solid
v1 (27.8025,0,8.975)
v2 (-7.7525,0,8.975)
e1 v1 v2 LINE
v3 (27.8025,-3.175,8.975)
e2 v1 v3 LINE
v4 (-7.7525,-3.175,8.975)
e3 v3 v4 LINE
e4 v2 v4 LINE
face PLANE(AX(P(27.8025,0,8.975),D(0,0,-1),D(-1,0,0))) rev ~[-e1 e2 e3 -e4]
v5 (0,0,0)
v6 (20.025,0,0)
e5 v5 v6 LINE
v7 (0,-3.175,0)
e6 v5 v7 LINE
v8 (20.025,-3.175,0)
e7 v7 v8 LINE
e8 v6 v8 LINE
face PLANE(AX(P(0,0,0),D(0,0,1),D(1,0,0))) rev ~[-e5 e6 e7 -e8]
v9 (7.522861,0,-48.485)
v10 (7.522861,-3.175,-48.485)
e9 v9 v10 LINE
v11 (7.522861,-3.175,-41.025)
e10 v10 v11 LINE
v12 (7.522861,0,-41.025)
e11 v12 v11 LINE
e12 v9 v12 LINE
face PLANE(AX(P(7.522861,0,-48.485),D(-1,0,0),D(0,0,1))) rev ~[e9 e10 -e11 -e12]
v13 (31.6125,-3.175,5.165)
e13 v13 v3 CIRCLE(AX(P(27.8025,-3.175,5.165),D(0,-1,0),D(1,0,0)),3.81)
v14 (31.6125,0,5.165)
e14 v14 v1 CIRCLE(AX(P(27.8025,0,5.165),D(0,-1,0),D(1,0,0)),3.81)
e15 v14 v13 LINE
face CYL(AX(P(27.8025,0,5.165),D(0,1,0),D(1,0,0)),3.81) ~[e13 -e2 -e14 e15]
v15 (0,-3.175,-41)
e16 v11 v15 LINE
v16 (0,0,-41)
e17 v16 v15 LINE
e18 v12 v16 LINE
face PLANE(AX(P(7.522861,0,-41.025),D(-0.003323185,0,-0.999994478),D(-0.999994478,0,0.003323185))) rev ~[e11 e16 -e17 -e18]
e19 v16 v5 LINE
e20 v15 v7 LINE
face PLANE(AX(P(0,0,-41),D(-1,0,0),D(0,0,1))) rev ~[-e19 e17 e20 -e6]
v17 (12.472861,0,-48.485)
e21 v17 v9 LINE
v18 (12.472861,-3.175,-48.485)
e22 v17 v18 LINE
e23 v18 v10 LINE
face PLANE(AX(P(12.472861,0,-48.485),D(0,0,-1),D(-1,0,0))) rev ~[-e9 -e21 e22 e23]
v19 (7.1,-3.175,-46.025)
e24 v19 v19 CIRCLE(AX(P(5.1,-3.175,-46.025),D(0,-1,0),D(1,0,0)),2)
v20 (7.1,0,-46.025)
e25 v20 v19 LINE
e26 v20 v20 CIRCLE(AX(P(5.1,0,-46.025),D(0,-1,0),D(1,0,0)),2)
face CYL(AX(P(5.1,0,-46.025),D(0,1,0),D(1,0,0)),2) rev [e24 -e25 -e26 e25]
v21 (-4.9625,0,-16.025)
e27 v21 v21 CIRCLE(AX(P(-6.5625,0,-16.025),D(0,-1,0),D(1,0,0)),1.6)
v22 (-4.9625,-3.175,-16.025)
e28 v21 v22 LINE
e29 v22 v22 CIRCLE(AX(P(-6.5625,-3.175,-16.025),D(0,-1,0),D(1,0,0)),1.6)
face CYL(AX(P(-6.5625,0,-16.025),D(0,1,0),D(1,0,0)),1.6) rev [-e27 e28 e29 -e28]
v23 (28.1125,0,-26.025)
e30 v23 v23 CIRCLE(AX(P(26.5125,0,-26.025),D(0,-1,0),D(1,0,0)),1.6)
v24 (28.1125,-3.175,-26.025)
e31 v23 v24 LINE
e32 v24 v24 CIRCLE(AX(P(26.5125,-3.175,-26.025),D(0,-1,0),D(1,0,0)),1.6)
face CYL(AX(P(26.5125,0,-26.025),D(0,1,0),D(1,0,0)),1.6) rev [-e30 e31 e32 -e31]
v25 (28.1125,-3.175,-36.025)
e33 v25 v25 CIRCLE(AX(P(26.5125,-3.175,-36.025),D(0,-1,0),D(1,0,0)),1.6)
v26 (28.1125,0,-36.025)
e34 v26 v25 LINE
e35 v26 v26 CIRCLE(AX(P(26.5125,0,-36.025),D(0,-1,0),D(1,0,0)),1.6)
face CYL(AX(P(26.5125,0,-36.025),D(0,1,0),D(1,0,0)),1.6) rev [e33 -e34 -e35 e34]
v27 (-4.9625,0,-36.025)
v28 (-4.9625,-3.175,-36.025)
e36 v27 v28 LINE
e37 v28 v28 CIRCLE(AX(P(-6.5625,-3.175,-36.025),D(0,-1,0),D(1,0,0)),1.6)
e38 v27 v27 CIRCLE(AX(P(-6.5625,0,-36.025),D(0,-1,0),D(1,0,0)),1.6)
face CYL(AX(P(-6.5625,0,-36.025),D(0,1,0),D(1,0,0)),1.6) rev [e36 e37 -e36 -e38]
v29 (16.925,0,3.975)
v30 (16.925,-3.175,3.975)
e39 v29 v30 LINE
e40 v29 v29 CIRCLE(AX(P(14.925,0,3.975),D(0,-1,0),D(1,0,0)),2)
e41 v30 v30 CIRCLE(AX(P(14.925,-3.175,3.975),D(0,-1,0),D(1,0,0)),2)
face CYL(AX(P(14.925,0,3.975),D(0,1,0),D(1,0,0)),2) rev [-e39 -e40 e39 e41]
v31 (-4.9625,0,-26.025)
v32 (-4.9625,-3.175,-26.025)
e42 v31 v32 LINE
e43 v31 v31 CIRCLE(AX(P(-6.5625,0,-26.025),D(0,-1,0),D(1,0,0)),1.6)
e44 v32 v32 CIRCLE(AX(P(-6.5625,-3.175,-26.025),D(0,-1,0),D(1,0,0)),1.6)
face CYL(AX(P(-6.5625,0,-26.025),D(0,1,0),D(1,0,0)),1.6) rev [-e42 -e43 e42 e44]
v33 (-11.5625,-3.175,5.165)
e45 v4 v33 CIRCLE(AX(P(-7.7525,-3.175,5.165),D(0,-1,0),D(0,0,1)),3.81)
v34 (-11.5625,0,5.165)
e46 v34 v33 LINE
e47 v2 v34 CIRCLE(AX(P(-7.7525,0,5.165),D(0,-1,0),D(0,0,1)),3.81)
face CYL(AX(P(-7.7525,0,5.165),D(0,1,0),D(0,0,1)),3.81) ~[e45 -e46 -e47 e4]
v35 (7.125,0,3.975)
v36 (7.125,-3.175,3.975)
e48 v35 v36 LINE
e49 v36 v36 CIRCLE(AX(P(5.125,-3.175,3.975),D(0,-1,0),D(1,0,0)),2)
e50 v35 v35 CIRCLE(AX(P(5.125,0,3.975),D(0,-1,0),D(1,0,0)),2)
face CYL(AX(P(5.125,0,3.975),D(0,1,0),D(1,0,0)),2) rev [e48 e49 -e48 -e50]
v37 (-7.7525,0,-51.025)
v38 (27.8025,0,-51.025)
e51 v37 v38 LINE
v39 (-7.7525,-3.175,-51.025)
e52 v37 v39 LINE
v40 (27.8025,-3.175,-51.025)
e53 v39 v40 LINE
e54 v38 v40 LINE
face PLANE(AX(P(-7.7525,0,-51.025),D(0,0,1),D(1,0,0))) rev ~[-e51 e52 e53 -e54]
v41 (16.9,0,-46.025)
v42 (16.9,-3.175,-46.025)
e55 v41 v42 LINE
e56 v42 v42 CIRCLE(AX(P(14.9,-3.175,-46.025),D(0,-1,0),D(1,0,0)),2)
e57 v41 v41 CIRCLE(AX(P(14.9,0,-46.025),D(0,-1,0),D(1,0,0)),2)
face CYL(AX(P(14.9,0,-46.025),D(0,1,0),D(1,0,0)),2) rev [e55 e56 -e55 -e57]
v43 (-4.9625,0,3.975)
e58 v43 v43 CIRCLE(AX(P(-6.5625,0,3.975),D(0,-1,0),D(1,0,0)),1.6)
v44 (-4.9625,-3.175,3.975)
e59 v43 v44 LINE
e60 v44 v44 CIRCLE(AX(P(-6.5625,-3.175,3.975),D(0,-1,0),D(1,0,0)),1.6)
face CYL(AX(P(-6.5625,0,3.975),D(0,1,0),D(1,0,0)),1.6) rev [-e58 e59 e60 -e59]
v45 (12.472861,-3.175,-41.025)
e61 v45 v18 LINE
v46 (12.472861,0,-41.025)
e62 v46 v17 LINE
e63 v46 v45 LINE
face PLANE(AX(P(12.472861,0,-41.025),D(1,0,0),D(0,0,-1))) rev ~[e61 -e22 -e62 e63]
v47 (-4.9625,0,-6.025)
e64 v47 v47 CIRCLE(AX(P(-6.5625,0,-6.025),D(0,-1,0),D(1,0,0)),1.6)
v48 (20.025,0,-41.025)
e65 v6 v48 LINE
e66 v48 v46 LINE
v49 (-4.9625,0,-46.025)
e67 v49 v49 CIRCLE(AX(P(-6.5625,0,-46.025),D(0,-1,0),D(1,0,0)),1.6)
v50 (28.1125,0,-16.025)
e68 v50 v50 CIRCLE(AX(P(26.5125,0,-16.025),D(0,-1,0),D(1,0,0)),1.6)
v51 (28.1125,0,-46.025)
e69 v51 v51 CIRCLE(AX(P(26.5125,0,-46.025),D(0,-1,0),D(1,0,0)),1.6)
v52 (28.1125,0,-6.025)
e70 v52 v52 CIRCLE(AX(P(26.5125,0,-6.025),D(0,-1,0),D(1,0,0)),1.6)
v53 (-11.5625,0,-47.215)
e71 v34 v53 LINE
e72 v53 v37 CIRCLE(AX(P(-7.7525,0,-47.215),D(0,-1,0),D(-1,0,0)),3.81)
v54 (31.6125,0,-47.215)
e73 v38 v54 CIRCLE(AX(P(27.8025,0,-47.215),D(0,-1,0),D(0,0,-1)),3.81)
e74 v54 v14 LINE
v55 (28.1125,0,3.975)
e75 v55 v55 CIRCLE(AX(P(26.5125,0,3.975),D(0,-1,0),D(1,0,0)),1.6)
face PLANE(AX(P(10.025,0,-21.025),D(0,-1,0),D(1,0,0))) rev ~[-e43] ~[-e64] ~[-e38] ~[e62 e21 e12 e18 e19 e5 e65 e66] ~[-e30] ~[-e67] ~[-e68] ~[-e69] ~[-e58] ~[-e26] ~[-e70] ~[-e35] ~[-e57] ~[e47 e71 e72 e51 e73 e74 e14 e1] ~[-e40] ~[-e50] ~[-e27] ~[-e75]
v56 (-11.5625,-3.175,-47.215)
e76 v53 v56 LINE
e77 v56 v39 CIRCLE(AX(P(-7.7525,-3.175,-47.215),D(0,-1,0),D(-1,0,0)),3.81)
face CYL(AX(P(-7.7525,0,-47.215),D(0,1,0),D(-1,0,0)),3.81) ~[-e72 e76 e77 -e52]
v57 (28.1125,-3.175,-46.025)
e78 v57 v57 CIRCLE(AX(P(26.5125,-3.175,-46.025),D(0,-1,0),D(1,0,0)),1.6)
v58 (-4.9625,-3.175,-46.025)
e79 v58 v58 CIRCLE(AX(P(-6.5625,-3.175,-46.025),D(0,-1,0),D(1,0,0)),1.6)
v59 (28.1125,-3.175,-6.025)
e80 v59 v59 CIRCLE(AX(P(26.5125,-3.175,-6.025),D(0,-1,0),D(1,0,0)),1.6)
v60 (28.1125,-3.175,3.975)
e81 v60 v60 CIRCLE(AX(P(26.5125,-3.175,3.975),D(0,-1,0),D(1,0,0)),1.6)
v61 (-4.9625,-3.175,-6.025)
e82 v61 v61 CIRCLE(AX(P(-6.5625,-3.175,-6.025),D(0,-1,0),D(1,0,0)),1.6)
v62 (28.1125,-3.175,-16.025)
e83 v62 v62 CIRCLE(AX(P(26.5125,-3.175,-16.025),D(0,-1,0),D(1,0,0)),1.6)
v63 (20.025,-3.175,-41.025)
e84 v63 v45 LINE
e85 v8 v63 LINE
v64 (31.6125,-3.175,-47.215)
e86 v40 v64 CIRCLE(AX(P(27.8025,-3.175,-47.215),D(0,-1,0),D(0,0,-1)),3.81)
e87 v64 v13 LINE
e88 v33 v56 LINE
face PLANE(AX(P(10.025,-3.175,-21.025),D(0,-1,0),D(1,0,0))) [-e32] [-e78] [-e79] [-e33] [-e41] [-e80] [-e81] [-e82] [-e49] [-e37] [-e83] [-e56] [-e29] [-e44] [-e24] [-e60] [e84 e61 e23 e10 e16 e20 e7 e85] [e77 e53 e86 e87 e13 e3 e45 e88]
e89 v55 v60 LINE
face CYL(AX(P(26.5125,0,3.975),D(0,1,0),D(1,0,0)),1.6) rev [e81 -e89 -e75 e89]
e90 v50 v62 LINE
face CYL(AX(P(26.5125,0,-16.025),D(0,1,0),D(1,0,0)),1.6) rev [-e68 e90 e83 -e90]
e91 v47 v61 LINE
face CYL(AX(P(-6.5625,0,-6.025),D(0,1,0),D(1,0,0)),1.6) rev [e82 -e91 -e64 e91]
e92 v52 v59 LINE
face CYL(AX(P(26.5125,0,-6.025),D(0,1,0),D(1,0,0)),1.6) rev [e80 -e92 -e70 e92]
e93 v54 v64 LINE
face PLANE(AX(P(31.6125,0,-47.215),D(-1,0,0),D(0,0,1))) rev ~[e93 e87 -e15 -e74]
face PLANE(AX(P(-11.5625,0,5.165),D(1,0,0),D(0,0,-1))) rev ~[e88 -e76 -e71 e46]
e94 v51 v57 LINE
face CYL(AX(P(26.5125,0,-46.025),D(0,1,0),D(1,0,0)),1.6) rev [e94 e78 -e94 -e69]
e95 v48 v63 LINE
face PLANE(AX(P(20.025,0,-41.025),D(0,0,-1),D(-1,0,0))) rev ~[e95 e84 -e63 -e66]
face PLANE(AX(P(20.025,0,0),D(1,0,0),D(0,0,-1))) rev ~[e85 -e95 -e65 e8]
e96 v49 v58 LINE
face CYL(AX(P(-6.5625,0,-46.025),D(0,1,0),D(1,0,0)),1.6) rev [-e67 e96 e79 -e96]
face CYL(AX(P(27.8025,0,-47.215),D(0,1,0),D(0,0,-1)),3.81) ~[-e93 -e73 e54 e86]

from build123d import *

# Parameters (mm, degrees)
F0_R     = 1.6
F0_R_2   = 2
F1_DEPTH = 3.175


# Not quite as in the source:
# - a length typed as a fraction of an inch, garbled in the dataset ("3 / 203.2 mm" for 3/8 in), is restored


with BuildPart() as f1:
    # F0 (on Front) → F1 (new body)
    with BuildSketch(Plane.XZ):
        with BuildLine():
            Line((27.8025, 8.975), (-7.7525, 8.975))
            ThreePointArc((-7.7525, 8.975), (-10.4465768363, 7.8590768363), (-11.5625, 5.165))
            Line((-11.5625, 5.165), (-11.5625, -47.215))
            ThreePointArc((-11.5625, -47.215), (-10.4465768363, -49.9090768363), (-7.7525, -51.025))
            Line((-7.7525, -51.025), (27.8025, -51.025))
            ThreePointArc((27.8025, -51.025), (30.4965768363, -49.9090768363), (31.6125, -47.215))
            Line((31.6125, -47.215), (31.6125, 5.165))
            ThreePointArc((31.6125, 5.165), (30.4965768363, 7.8590768363), (27.8025, 8.975))
        make_face()
        with Locations((-6.5625, -46.025)):
            Circle(F0_R, mode=Mode.SUBTRACT)
        with Locations((5.1, -46.025)):
            Circle(F0_R_2, mode=Mode.SUBTRACT)
        with Locations((-6.5625, -36.025)):
            Circle(F0_R, mode=Mode.SUBTRACT)
        with Locations((-6.5625, -26.025)):
            Circle(F0_R, mode=Mode.SUBTRACT)
        Polygon((0, -41), (0, 0), (20.025, 0), (20.025, -41.025), (12.4728614733, -41.025), (12.4728614733, -48.485), (7.5228614733, -48.485), (7.5228614733, -41.025), align=None, mode=Mode.SUBTRACT)
        with Locations((14.9, -46.025)):
            Circle(F0_R_2, mode=Mode.SUBTRACT)
        with Locations((26.5125, -46.025)):
            Circle(F0_R, mode=Mode.SUBTRACT)
        with Locations((26.5125, -36.025)):
            Circle(F0_R, mode=Mode.SUBTRACT)
        with Locations((26.5125, -26.025)):
            Circle(F0_R, mode=Mode.SUBTRACT)
        with Locations((-6.5625, -16.025)):
            Circle(F0_R, mode=Mode.SUBTRACT)
        with Locations((-6.5625, -6.025)):
            Circle(F0_R, mode=Mode.SUBTRACT)
        with Locations((-6.5625, 3.975)):
            Circle(F0_R, mode=Mode.SUBTRACT)
        with Locations((5.125, 3.975)):
            Circle(F0_R_2, mode=Mode.SUBTRACT)
        with Locations((26.5125, -16.025)):
            Circle(F0_R, mode=Mode.SUBTRACT)
        with Locations((14.925, 3.975)):
            Circle(F0_R_2, mode=Mode.SUBTRACT)
        with Locations((26.5125, -6.025)):
            Circle(F0_R, mode=Mode.SUBTRACT)
        with Locations((26.5125, 3.975)):
            Circle(F0_R, mode=Mode.SUBTRACT)
    extrude(amount=F1_DEPTH)


solid = f1.part
